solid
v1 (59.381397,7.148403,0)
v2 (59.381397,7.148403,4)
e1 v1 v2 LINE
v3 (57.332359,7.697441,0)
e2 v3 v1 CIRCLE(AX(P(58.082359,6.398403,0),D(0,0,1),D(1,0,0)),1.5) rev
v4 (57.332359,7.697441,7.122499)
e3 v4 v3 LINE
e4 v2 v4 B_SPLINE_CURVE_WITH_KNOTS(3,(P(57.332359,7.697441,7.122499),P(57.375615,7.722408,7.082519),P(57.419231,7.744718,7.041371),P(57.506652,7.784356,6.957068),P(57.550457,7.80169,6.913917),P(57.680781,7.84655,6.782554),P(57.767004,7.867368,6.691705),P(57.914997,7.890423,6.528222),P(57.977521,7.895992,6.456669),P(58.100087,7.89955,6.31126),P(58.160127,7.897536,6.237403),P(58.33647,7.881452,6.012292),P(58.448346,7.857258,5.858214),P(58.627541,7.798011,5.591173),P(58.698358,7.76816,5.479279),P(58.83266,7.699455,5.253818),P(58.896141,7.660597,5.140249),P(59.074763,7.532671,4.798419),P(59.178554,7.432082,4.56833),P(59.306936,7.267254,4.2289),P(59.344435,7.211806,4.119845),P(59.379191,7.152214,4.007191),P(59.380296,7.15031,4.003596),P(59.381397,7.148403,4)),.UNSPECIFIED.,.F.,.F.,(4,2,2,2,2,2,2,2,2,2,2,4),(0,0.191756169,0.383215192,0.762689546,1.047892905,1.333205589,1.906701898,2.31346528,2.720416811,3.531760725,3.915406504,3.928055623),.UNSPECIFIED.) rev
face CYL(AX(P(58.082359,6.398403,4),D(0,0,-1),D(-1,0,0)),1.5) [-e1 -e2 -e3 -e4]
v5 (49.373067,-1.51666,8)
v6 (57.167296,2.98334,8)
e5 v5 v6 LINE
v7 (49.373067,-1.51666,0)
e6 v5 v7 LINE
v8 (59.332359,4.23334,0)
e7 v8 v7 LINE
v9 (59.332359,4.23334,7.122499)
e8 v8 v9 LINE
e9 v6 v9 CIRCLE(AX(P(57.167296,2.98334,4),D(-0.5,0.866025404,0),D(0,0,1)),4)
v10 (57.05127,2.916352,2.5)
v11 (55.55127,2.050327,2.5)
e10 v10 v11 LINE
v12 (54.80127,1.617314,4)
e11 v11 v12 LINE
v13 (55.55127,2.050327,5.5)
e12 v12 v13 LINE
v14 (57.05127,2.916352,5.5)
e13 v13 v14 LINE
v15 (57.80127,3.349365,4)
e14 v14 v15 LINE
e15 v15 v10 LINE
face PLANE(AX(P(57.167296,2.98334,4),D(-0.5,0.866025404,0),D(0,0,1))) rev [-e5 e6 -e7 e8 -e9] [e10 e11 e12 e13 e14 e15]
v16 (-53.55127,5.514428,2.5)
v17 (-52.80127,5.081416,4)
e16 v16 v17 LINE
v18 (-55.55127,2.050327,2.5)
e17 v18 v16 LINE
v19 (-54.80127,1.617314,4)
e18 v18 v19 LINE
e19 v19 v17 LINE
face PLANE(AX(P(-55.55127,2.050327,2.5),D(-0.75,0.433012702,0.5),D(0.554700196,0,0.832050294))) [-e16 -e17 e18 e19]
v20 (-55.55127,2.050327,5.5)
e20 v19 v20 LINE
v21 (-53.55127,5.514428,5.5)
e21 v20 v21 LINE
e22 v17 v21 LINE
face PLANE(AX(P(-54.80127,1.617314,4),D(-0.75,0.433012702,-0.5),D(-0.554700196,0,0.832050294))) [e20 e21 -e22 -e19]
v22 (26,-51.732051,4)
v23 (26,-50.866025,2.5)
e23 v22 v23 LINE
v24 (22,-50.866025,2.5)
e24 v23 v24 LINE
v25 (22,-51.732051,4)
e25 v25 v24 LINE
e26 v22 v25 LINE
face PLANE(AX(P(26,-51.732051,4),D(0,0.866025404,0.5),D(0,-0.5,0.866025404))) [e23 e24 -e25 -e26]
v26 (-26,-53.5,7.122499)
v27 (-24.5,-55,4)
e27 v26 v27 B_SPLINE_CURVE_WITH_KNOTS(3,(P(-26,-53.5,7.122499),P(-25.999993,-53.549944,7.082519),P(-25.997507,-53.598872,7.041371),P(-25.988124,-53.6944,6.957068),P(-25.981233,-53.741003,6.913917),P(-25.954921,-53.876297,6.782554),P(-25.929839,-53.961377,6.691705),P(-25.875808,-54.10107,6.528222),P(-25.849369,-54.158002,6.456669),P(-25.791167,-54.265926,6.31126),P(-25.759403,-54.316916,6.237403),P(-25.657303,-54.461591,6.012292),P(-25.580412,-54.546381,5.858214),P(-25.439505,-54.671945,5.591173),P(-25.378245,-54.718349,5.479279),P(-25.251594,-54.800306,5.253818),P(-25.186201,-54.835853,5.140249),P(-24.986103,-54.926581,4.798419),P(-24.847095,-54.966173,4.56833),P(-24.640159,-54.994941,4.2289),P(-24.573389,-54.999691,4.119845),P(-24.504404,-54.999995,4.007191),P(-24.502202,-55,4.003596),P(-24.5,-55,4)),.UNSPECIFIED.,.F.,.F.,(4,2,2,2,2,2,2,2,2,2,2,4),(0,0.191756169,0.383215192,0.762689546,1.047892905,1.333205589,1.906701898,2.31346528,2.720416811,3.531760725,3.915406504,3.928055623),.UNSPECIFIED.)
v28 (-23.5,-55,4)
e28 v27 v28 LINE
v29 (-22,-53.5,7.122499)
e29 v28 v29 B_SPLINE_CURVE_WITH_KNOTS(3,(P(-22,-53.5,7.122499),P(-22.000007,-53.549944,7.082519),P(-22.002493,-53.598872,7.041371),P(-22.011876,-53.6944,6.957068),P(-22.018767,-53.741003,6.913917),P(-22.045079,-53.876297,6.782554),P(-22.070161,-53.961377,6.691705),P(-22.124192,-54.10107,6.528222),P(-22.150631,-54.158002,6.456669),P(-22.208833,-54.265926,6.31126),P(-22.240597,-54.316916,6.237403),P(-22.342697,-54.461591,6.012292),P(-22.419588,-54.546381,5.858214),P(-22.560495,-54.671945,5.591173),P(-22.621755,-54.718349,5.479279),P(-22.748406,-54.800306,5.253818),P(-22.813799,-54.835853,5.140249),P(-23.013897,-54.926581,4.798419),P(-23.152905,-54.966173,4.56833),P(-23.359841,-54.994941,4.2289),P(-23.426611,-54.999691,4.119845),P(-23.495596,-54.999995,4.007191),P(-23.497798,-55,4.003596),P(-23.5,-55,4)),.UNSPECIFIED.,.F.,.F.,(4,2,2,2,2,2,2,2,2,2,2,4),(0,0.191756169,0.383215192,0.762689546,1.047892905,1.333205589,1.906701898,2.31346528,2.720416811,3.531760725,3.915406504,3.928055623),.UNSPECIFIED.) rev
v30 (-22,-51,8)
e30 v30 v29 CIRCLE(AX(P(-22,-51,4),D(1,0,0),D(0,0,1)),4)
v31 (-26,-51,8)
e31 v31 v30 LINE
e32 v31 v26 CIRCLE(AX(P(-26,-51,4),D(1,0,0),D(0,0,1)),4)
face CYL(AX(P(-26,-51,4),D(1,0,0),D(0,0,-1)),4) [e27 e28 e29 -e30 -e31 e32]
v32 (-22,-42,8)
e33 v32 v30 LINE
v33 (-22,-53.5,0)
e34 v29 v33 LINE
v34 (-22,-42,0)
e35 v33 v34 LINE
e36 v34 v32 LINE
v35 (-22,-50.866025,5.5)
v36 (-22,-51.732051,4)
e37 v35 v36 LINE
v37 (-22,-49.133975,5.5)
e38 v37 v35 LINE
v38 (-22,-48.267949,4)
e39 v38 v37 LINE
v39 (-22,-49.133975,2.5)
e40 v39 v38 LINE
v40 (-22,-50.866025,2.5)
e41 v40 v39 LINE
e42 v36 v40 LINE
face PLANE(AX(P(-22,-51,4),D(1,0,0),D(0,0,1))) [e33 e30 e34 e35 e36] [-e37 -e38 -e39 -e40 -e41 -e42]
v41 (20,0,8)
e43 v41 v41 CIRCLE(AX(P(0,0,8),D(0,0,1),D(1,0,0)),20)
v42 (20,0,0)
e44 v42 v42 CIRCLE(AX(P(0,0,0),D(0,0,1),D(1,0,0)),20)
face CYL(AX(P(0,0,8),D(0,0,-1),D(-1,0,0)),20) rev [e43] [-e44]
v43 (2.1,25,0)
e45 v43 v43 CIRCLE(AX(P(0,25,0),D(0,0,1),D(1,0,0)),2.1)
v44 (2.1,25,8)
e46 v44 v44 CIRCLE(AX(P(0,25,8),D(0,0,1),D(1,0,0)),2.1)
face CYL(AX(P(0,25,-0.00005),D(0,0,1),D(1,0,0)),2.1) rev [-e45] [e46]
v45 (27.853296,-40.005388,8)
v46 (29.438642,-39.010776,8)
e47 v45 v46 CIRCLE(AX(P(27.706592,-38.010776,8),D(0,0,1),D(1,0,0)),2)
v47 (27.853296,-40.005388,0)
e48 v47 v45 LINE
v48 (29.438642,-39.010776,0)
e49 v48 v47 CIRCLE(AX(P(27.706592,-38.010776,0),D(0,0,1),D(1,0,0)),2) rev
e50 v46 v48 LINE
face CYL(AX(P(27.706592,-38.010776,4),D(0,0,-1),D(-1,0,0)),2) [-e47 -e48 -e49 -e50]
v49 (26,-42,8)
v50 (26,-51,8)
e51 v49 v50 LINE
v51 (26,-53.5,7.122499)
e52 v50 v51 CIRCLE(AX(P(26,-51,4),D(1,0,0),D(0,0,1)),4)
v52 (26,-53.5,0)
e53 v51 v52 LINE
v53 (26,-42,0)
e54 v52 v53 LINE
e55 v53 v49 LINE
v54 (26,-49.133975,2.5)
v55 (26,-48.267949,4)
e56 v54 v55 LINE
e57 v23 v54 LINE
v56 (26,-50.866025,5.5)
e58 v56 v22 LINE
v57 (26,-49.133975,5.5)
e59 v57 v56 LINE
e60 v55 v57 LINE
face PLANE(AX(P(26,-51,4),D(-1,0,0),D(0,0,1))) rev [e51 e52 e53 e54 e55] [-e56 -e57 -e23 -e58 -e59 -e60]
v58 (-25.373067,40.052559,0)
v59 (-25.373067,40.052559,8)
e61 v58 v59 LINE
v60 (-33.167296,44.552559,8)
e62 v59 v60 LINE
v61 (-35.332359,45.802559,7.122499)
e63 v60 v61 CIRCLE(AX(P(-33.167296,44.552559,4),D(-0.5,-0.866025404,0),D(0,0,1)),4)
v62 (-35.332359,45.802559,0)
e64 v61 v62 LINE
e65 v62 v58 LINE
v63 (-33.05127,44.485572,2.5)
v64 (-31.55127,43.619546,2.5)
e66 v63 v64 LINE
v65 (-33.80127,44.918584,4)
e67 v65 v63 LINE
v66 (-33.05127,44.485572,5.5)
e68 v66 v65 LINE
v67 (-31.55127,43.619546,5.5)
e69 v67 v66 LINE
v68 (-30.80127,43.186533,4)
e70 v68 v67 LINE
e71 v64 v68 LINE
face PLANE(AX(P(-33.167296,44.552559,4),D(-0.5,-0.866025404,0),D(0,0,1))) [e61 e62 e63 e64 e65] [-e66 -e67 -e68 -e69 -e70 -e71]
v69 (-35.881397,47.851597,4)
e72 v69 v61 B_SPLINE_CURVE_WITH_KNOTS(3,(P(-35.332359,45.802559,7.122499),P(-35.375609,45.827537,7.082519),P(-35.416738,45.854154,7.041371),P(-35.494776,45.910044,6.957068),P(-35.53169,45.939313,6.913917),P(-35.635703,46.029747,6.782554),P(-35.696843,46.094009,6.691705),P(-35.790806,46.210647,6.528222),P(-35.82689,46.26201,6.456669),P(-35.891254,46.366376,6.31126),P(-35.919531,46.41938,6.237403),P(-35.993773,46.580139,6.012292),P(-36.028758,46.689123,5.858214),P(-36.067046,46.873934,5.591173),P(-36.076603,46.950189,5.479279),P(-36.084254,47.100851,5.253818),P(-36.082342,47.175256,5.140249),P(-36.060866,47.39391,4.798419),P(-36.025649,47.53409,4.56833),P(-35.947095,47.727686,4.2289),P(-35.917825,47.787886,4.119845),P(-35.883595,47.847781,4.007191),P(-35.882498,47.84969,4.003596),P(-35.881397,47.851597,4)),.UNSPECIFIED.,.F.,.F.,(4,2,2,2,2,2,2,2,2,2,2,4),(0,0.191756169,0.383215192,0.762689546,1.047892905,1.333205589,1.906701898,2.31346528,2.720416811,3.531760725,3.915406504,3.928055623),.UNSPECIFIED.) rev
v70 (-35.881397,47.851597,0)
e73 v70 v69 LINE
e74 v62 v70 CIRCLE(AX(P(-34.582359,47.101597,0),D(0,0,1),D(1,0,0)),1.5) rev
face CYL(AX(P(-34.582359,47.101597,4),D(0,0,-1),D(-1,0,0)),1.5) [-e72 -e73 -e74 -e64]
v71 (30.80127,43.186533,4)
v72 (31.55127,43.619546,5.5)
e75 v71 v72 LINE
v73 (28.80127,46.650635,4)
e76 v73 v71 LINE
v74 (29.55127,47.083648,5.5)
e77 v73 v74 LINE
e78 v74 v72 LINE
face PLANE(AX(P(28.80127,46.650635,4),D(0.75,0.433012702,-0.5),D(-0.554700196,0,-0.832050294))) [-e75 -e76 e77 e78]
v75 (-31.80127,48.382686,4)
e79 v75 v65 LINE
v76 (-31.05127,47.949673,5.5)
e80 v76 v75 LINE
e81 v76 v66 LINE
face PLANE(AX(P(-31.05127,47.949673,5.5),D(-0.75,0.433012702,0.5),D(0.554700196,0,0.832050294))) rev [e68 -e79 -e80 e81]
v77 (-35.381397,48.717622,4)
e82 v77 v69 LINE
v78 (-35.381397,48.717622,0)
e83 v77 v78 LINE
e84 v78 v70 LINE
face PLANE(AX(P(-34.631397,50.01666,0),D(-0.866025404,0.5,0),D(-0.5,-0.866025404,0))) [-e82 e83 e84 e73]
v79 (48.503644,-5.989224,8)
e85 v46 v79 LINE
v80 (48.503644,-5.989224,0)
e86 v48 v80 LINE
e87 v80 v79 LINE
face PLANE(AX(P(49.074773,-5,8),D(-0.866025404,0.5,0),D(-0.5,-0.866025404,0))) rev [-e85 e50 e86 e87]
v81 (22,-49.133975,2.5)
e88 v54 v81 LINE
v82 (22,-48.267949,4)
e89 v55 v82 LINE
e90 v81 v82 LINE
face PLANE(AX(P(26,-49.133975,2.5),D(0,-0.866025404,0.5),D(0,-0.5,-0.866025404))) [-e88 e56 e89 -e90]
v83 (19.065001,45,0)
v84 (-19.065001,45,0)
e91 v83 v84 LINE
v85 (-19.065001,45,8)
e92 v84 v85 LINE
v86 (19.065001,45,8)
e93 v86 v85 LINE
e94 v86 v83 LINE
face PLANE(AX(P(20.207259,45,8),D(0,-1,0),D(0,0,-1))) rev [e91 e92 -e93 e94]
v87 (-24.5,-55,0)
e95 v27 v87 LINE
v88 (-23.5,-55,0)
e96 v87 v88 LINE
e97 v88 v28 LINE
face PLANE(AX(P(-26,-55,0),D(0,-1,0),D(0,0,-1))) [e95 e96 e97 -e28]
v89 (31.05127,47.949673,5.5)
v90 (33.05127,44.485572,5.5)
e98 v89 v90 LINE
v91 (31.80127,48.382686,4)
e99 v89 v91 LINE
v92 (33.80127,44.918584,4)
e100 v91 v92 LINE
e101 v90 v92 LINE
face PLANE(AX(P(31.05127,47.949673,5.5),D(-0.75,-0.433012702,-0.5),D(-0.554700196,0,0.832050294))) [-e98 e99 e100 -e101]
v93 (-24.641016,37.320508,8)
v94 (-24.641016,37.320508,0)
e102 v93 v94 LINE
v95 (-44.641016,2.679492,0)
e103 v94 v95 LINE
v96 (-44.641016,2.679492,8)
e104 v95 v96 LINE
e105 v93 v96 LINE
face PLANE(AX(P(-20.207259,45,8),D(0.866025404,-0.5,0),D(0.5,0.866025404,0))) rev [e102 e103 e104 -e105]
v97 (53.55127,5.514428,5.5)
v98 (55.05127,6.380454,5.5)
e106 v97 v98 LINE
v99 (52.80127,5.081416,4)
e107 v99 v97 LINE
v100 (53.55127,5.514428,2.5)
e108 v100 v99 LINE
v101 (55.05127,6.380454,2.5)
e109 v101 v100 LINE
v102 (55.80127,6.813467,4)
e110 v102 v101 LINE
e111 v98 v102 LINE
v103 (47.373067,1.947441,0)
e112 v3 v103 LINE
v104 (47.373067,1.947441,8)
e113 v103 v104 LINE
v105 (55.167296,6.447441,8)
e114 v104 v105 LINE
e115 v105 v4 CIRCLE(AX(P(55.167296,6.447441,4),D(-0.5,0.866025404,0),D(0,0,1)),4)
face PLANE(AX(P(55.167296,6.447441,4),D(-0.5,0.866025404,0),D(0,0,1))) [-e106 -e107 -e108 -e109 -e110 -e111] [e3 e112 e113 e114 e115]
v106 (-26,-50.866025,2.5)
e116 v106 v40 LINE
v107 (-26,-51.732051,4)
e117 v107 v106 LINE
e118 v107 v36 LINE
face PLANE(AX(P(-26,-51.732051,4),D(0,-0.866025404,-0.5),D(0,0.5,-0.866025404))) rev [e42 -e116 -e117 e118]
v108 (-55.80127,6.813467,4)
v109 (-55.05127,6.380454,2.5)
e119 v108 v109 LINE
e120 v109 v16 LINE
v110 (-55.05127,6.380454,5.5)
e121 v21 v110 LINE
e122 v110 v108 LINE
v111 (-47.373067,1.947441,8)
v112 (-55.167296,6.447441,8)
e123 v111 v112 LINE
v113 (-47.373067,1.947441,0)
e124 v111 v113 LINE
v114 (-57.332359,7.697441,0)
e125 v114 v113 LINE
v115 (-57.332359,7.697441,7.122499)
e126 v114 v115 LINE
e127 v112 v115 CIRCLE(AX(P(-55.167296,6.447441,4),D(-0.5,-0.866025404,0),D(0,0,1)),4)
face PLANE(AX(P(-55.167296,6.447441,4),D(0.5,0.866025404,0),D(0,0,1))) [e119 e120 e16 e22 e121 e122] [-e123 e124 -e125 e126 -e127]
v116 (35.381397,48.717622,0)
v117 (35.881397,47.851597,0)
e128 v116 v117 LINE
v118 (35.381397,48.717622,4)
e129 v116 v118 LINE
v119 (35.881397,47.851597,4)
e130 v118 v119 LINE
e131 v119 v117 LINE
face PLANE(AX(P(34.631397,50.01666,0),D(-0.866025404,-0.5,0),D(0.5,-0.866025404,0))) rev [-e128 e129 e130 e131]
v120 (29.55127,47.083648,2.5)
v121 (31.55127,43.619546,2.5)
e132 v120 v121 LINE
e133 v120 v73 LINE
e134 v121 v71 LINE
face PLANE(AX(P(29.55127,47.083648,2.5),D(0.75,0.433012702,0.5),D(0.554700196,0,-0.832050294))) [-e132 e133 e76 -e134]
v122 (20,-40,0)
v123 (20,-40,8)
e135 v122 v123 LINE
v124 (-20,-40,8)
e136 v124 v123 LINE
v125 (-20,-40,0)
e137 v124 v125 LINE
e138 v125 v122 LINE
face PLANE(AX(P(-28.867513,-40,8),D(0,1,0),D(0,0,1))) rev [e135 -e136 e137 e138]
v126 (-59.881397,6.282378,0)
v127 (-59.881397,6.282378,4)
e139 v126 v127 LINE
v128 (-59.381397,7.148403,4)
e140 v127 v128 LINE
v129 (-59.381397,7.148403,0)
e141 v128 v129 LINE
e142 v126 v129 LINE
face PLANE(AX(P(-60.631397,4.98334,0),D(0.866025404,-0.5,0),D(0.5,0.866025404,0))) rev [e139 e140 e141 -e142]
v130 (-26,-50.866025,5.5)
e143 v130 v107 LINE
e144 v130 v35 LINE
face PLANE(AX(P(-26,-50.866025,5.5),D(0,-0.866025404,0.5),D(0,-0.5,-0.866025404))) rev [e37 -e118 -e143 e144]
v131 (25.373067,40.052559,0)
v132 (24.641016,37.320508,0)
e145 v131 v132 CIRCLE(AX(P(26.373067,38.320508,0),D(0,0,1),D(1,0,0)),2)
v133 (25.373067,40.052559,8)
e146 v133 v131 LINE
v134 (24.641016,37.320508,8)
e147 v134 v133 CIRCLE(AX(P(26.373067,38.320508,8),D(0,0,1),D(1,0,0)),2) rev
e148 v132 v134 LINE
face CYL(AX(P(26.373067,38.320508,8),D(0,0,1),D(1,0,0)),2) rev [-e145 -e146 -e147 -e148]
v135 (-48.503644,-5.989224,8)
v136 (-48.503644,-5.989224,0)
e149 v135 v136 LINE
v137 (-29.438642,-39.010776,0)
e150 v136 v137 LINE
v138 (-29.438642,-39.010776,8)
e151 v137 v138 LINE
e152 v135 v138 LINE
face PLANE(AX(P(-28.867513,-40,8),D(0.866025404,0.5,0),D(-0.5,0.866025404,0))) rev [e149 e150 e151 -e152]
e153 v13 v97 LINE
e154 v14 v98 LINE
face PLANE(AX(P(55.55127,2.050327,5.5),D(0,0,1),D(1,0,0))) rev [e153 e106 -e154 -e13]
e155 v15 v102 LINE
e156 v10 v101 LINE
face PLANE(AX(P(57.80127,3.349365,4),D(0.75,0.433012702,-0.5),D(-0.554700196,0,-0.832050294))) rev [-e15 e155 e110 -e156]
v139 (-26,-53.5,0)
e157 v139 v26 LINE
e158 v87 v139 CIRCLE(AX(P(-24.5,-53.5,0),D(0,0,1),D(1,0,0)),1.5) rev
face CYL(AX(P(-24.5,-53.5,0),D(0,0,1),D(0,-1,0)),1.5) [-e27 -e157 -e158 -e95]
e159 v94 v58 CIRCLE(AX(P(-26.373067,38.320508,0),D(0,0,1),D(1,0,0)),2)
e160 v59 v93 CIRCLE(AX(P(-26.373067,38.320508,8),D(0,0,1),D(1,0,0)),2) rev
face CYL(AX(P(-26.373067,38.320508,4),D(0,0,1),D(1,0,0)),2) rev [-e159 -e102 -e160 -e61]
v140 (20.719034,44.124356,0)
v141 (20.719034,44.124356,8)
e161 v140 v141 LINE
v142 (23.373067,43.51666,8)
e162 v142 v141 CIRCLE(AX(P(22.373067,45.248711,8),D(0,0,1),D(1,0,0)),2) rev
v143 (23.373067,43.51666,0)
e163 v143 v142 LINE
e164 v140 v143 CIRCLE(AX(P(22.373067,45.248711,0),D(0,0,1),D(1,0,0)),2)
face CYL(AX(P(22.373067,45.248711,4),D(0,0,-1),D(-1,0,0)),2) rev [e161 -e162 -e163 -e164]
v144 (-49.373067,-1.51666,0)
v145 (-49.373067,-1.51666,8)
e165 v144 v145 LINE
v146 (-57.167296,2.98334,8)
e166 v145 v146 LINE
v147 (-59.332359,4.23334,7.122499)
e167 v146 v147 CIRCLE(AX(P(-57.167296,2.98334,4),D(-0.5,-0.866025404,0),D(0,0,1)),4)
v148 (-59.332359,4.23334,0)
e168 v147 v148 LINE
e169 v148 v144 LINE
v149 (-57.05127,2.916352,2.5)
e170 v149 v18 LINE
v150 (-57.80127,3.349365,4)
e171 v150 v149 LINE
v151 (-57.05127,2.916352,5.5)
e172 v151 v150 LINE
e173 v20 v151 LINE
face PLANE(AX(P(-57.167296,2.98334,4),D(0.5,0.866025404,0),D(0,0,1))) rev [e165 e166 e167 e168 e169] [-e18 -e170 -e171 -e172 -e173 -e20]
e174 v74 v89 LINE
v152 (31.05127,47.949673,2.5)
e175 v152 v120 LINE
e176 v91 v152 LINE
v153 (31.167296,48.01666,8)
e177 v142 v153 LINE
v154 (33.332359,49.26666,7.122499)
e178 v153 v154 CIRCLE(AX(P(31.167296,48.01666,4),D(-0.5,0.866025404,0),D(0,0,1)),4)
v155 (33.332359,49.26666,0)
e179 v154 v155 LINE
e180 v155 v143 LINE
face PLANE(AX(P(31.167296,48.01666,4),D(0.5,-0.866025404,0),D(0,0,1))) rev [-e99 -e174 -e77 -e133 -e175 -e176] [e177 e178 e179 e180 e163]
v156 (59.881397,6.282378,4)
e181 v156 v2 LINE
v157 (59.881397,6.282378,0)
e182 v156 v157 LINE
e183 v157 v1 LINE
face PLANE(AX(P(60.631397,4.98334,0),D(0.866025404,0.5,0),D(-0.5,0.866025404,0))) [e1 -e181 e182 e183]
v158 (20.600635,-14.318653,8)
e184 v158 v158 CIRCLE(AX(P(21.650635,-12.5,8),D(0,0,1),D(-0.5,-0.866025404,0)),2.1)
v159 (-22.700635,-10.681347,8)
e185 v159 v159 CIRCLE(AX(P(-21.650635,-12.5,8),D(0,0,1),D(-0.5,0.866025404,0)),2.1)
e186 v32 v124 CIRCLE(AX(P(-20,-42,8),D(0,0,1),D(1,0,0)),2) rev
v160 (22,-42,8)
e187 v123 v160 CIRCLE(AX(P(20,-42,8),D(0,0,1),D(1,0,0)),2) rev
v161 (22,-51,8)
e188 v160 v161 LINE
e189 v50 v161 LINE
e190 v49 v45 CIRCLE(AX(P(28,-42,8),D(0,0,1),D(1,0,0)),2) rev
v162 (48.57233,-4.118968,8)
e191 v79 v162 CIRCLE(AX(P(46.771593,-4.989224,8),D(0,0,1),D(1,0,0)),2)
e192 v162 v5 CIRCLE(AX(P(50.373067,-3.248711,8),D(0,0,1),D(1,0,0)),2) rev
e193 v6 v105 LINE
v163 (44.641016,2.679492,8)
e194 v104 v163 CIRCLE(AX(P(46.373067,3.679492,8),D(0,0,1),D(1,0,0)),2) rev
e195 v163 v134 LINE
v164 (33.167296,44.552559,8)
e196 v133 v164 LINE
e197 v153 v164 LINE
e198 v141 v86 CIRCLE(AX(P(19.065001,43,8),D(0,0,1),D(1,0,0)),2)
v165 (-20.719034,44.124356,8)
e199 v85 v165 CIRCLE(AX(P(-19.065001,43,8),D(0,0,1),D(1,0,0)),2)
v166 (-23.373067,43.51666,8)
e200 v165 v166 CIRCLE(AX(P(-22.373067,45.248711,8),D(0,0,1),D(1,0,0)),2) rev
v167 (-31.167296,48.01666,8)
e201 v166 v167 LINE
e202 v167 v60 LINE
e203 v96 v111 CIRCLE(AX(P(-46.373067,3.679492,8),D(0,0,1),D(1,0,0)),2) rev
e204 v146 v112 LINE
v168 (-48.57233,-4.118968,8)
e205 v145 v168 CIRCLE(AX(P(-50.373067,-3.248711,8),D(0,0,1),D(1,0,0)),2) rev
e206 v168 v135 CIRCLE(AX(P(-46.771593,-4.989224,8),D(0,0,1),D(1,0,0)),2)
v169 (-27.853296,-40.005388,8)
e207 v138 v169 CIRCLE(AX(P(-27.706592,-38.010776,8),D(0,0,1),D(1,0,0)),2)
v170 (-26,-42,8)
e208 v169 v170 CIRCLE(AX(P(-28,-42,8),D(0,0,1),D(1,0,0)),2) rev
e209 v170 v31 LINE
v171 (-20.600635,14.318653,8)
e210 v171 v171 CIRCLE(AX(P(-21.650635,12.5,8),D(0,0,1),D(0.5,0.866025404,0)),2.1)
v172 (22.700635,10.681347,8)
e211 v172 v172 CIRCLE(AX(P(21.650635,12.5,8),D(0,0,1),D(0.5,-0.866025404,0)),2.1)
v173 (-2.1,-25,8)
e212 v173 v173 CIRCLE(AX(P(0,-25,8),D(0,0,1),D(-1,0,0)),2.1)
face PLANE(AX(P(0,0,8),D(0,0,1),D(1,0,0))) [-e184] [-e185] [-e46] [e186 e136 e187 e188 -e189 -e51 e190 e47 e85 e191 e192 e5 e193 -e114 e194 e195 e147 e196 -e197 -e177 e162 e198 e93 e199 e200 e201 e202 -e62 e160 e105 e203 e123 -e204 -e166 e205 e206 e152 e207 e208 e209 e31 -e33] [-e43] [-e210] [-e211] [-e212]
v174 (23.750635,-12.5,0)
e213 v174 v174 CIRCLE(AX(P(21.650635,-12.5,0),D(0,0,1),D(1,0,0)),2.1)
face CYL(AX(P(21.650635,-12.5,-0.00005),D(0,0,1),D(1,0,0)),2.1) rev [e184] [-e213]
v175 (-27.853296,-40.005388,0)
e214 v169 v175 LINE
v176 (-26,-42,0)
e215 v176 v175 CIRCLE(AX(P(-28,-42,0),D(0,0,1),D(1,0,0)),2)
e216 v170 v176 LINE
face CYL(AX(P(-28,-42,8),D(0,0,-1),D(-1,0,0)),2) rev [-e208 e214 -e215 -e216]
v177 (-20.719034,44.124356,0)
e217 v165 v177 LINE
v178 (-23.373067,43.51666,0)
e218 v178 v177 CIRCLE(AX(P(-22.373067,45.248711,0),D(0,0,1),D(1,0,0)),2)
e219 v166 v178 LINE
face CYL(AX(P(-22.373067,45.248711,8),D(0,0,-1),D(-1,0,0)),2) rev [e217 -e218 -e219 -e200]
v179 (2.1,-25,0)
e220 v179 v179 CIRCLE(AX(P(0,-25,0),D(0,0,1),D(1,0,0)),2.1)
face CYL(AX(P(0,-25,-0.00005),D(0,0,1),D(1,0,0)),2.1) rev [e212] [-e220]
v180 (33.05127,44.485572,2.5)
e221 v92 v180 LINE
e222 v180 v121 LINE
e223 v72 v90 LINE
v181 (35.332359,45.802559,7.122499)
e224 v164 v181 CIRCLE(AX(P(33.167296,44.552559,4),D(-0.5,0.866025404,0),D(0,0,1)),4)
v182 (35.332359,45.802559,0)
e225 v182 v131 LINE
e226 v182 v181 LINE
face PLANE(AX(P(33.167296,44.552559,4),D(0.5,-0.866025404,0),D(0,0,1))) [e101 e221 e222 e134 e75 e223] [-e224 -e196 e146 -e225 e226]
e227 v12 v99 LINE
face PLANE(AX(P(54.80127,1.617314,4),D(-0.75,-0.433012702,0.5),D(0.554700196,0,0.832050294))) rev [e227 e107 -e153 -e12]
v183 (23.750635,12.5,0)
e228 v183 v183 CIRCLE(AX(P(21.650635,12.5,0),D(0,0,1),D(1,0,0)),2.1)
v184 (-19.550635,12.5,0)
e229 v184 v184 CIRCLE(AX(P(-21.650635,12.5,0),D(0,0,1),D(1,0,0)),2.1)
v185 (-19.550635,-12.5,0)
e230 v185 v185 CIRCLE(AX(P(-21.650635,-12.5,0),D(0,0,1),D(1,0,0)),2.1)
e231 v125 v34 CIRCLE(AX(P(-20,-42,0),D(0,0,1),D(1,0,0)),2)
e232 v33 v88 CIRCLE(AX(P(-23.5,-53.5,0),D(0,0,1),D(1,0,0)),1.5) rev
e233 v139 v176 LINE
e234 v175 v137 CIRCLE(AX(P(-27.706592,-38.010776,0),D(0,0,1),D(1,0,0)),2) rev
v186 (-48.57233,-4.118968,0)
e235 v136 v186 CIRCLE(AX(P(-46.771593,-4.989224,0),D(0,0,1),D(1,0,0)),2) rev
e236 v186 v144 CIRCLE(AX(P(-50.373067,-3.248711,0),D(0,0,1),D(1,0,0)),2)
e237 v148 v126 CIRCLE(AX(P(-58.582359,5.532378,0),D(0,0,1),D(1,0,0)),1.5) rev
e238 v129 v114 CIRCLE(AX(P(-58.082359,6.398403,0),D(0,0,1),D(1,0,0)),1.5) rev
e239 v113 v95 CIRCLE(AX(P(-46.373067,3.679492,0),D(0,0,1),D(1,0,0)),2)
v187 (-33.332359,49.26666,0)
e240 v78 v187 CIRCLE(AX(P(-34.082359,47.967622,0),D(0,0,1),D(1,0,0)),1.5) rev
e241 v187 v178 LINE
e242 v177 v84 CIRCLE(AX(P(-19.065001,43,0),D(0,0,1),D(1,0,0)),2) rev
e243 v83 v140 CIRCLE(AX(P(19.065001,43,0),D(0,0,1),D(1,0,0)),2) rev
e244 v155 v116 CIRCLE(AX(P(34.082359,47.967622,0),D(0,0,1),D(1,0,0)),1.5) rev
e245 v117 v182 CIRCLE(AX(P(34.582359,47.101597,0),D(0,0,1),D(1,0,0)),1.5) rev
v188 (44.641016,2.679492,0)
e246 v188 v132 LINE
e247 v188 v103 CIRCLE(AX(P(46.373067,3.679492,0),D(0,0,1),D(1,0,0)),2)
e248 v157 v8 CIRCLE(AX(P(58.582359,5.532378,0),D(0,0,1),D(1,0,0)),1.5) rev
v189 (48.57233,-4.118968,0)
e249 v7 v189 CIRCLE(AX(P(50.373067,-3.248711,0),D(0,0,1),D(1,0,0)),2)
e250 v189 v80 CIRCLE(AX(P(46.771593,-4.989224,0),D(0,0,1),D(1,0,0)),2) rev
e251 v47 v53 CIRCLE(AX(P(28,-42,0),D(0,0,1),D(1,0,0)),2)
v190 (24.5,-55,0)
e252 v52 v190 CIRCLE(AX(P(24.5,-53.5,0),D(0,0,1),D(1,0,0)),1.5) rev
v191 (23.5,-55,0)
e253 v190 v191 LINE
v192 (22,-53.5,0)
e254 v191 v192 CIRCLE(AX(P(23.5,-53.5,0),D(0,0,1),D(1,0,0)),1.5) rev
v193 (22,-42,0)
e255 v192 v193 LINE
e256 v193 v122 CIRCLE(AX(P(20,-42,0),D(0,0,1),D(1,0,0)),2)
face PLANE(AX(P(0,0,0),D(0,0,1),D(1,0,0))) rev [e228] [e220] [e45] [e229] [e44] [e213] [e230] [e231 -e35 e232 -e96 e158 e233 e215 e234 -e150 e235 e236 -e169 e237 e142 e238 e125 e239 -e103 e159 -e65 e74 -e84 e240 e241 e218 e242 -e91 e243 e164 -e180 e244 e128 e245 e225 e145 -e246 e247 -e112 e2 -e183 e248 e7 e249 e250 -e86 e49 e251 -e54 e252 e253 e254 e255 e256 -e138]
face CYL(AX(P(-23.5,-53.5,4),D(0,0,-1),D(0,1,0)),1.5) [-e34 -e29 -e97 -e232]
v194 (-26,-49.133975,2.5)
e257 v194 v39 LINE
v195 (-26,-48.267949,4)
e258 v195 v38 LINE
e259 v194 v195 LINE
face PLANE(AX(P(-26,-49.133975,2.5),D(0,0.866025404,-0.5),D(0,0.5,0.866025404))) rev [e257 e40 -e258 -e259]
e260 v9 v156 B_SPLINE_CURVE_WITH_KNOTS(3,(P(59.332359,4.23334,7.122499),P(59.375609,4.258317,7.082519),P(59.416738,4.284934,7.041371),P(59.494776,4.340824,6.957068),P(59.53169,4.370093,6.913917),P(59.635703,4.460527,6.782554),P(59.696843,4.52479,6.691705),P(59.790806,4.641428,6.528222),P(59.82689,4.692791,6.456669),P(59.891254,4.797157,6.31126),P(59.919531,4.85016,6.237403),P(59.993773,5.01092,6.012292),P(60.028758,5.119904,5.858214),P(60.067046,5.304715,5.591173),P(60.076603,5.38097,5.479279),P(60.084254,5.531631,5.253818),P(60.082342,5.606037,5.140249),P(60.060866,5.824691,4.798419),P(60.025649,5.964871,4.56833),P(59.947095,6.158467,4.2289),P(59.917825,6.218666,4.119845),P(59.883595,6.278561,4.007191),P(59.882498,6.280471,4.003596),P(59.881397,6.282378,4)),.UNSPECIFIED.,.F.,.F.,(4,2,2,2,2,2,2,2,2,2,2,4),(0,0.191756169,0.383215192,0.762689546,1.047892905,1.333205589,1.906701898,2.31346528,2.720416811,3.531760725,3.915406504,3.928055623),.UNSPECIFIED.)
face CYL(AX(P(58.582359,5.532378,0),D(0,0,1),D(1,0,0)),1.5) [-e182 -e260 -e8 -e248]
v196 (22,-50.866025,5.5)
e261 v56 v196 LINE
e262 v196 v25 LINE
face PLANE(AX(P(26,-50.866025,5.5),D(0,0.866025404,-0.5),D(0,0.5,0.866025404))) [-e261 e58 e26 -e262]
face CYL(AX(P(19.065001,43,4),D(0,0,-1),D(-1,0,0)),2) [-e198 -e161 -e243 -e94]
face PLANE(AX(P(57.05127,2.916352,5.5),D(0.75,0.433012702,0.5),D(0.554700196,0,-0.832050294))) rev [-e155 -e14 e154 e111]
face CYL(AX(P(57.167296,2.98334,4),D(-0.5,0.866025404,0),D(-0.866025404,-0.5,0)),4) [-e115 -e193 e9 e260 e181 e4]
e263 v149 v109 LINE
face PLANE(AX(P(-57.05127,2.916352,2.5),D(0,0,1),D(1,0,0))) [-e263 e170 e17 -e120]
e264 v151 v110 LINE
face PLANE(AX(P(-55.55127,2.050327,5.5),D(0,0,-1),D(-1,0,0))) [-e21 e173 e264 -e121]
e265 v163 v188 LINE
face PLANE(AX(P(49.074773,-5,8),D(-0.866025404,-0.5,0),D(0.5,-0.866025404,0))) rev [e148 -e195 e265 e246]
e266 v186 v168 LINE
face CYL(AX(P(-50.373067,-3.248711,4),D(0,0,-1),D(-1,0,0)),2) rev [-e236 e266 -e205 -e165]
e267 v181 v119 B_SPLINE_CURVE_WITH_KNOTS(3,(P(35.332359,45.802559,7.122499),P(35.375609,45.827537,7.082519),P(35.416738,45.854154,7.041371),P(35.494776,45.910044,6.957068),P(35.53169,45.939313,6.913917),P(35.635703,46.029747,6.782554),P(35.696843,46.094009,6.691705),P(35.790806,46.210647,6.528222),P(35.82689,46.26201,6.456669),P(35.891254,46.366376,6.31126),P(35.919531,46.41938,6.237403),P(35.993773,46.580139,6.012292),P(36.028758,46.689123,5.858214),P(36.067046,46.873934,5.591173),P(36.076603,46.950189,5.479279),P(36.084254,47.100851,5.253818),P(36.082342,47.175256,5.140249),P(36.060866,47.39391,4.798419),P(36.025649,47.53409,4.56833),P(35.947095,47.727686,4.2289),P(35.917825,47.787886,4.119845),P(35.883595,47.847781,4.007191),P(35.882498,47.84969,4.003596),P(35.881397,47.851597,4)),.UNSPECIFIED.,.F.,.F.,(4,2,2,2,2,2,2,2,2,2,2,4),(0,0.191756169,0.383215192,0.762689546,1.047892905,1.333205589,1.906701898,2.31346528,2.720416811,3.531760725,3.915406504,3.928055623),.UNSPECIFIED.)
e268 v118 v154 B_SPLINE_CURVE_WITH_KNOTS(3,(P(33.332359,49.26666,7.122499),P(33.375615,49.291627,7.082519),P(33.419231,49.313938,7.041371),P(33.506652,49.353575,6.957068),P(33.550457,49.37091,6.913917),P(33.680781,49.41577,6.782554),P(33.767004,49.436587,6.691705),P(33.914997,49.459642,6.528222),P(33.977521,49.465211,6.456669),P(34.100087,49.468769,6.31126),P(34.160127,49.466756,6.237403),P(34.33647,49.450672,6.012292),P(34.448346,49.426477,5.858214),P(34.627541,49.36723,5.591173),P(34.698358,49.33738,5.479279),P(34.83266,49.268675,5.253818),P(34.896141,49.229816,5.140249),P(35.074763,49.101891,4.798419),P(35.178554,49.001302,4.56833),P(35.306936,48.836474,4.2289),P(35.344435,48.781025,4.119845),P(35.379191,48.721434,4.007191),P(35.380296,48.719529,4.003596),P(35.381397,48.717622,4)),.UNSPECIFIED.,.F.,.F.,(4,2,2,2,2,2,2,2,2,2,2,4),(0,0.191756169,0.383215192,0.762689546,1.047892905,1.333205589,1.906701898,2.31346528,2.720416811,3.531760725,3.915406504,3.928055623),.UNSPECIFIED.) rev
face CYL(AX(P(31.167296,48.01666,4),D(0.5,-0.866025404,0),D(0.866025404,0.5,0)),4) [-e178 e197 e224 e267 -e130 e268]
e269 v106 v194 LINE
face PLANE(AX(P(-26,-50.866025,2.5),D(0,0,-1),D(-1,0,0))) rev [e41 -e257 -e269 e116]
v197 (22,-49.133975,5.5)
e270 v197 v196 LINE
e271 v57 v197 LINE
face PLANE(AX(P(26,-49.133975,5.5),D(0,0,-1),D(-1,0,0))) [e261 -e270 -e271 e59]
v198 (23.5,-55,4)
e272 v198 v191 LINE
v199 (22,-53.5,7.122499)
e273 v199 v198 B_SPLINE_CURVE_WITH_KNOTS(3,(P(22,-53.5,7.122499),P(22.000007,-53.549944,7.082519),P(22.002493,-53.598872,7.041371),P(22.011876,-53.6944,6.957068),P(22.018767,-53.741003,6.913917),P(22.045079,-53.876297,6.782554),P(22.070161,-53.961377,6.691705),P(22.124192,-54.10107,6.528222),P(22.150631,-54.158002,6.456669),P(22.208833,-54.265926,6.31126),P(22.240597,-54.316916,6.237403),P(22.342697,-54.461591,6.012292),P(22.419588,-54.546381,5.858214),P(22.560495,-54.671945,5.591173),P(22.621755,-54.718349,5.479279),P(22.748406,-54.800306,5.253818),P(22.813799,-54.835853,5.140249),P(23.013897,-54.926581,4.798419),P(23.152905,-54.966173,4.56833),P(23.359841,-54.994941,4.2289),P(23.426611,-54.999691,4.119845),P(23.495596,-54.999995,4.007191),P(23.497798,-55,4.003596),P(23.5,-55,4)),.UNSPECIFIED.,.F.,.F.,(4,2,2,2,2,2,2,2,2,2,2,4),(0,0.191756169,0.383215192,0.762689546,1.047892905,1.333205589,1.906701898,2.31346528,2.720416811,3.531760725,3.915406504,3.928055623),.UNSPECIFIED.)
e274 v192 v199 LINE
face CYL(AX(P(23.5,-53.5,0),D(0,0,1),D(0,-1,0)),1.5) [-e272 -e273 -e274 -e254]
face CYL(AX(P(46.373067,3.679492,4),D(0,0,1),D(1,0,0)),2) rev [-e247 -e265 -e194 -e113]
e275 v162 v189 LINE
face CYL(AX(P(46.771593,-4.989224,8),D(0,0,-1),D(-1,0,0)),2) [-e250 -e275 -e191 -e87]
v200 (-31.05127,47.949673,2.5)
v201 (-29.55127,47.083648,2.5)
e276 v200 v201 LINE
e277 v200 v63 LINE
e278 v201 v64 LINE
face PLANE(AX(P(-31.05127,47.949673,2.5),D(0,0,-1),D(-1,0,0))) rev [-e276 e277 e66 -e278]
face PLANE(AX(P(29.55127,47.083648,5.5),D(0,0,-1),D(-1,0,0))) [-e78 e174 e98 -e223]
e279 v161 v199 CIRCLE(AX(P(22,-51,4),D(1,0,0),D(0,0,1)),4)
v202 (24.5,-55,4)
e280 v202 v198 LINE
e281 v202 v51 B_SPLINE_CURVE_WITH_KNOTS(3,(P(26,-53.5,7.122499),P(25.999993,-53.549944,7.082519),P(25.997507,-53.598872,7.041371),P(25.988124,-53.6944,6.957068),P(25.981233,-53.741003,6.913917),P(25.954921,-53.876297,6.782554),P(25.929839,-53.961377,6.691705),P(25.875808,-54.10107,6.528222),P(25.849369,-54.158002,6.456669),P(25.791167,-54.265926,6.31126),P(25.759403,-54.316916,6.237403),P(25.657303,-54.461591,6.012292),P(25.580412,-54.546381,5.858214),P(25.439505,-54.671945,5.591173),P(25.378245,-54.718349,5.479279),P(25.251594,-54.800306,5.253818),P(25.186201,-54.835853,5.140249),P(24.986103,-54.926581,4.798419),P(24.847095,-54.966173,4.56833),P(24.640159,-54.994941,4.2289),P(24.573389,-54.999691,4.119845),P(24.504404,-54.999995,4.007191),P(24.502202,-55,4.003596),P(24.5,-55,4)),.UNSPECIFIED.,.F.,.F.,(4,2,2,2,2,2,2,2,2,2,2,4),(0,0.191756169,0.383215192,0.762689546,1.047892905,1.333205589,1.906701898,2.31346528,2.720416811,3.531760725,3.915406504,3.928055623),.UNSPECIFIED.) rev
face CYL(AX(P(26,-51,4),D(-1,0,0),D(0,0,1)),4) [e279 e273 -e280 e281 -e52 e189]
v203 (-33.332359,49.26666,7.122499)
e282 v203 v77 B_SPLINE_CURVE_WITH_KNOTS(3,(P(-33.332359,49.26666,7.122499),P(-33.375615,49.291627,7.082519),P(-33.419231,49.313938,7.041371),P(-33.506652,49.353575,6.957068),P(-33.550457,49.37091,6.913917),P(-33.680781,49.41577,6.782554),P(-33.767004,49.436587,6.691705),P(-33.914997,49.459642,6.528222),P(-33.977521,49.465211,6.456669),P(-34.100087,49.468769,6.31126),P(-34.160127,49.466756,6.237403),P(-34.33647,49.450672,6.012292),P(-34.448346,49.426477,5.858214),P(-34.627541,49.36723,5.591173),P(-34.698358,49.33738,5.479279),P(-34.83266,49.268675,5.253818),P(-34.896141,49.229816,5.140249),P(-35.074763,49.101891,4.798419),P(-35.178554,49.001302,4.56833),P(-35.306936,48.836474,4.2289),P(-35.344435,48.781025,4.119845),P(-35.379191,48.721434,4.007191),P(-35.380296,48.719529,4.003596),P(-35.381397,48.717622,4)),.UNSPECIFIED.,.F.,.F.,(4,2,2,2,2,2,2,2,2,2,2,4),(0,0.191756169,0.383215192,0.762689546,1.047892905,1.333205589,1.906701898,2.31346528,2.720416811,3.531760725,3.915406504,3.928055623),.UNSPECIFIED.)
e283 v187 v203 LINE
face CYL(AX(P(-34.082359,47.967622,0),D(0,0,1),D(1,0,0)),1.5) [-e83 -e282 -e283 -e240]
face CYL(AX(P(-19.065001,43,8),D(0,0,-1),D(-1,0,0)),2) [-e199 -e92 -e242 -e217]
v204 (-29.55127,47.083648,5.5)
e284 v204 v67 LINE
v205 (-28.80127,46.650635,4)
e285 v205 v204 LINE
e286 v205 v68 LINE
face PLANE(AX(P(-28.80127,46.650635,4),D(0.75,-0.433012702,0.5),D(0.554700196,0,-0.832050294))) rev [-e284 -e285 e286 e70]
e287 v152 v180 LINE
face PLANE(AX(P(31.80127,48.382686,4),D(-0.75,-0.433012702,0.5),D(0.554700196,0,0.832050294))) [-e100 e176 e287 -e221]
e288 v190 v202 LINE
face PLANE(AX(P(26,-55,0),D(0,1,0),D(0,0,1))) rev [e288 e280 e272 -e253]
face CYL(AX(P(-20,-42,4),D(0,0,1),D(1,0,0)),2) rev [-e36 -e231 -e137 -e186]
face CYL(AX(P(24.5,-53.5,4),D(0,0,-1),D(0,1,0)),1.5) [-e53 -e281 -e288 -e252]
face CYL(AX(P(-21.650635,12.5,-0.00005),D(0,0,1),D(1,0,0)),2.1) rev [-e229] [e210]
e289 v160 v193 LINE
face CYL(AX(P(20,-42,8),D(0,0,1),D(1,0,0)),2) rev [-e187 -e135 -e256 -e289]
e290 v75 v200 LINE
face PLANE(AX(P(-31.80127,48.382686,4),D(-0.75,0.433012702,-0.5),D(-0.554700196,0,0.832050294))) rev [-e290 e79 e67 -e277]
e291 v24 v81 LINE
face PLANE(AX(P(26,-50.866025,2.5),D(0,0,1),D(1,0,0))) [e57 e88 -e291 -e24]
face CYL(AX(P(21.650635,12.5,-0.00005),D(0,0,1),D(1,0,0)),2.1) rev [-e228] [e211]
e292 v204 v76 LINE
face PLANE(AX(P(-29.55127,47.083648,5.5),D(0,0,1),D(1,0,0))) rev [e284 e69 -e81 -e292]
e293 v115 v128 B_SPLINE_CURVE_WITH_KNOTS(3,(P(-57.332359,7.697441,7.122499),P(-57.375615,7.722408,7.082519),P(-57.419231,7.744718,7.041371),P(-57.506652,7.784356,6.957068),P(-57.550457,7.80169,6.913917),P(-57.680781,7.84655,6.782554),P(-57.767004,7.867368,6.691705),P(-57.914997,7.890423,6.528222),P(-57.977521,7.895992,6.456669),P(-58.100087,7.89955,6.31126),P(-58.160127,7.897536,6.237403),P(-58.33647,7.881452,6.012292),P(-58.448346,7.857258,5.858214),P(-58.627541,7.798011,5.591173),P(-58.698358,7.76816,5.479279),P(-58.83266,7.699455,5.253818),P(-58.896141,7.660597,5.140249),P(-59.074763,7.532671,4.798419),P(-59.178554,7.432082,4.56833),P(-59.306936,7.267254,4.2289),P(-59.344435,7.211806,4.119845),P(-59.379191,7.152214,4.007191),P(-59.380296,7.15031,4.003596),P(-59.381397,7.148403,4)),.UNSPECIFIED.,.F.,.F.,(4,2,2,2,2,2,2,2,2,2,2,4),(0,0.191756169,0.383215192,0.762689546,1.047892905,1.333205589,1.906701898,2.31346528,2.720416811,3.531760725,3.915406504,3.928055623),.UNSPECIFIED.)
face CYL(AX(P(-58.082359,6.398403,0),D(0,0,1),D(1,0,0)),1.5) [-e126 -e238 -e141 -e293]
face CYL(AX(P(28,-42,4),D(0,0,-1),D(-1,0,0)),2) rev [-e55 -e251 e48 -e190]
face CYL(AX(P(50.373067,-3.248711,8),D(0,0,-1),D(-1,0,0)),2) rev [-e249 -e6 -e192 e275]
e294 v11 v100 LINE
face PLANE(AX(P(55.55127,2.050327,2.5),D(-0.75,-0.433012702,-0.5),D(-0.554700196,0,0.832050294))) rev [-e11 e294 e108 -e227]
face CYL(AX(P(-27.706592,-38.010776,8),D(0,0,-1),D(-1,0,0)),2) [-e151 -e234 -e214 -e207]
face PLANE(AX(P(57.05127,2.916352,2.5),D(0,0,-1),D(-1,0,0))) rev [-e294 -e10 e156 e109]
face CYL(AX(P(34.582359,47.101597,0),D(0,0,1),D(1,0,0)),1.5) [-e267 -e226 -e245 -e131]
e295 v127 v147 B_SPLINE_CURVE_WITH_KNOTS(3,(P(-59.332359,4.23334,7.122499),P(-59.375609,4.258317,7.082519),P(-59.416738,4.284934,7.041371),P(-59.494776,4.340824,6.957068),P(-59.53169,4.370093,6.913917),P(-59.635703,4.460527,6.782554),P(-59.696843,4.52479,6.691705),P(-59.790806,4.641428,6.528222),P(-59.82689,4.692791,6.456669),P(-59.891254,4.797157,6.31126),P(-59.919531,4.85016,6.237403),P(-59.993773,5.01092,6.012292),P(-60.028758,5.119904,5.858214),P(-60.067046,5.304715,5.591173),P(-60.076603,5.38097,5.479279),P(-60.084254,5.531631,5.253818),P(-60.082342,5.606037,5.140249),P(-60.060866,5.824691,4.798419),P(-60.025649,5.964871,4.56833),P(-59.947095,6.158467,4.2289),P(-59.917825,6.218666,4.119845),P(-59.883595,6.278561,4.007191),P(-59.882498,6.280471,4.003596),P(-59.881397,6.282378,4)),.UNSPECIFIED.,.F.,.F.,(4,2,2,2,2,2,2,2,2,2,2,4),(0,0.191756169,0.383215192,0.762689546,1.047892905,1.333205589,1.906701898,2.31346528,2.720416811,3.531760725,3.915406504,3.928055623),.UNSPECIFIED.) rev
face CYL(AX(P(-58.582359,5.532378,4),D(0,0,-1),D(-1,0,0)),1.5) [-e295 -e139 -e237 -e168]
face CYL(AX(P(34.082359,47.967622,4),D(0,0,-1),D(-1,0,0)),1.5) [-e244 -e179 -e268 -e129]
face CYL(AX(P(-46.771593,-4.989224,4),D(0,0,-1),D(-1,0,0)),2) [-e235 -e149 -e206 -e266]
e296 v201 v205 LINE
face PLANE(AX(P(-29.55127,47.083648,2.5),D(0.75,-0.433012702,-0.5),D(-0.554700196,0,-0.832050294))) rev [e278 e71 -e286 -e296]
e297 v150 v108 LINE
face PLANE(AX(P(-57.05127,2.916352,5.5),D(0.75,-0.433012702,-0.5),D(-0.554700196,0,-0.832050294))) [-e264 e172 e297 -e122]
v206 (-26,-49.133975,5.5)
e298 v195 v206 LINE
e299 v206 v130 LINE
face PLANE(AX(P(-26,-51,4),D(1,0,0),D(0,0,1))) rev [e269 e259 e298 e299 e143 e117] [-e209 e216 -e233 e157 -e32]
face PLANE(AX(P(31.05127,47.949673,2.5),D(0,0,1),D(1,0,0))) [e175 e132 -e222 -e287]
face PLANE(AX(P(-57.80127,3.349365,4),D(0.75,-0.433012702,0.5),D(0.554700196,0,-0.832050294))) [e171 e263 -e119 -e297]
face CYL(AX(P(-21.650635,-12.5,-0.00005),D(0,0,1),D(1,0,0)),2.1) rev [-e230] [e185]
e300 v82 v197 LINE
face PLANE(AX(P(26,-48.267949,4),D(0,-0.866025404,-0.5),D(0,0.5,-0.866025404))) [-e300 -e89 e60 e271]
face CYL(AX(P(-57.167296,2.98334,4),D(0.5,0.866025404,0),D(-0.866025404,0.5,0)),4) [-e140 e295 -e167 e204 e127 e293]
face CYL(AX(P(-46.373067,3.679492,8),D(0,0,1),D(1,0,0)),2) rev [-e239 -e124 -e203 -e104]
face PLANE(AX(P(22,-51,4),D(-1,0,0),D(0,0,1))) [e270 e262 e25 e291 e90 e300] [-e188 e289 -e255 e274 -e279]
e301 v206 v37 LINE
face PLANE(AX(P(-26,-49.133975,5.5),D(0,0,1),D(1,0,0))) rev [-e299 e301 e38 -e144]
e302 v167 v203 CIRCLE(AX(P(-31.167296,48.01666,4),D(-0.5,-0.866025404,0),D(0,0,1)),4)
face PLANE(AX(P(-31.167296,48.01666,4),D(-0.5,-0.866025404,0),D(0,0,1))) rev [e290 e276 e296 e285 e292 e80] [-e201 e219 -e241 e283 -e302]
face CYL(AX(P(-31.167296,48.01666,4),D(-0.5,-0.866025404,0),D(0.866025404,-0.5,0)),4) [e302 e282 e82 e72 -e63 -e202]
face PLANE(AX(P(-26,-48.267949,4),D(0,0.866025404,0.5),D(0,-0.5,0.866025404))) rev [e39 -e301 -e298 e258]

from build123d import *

# Parameters (mm, degrees)
SKETCH1_R                = 20
BOSS_EXTRUDE1_DEPTH      = 8
BOSS_EXTRUDE3_START      = 22
BOSS_EXTRUDE3_DEPTH      = 4
CIRPATTERN1_COUNT        = 3
CIRPATTERN1_START        = 22
CIRPATTERN1_COPY_1_DEPTH = 4
CIRPATTERN1_COPY_2_DEPTH = 4
SKETCH4_R                = 2.1
CUT_EXTRUDE1_DEPTH       = 83.250631167
CIRPATTERN2_COUNT        = 6
FILLET2_R                = 2
FILLET4_R                = 1.5
FILLET5_R                = 2


with BuildPart() as part:
    # Sketch1 → Boss-Extrude1 (new body)
    with BuildSketch(Plane.XY):
        Polygon((49.074772881, -5), (20.207259422, 45), (-20.207259422, 45), (-49.074772881, -5), (-28.867513459, -40), (28.867513459, -40), align=None)
        Circle(SKETCH1_R, mode=Mode.SUBTRACT)
    extrude(amount=BOSS_EXTRUDE1_DEPTH)

    # Sketch3 → Boss-Extrude3 (add)
    with BuildSketch(Plane(origin=(0, 0, 0), x_dir=(0, 0, -1), z_dir=(1, 0, 0)).offset(BOSS_EXTRUDE3_START)):
        with BuildLine():
            Line((0, -40), (0, -55))
            Line((0, -55), (-4, -55))
            ThreePointArc((-4, -55), (-6.828427125, -53.828427125), (-8, -51))
            Line((-8, -51), (-8, -40))
            Line((-8, -40), (0, -40))
        make_face()
        Polygon((-4, -48.267949192), (-5.5, -49.133974596), (-5.5, -50.866025404), (-4, -51.732050808), (-2.5, -50.866025404), (-2.5, -49.133974596), align=None, mode=Mode.SUBTRACT)
    boss_extrude3 = extrude(amount=BOSS_EXTRUDE3_DEPTH)

    # Mirror1: Boss-Extrude3 across plane
    add(boss_extrude3.mirror(Plane(origin=(0, 0, 0), x_dir=(0, 0, 1), z_dir=(1, 0, 0))))

    # CirPattern1: Boss-Extrude3 ×3 about axis
    cirpattern1_axis = Axis((0, 0, 0), (0, 0, 1))
    for i in range(1, CIRPATTERN1_COUNT):
        add(boss_extrude3.rotate(cirpattern1_axis, i * 360 / CIRPATTERN1_COUNT))

    # CirPattern1 copy 1 sketch → CirPattern1 copy 1 (add)
    with BuildSketch(Plane(origin=(0, 0, 0), x_dir=(0, 0, -1), z_dir=(0.4999999999999998, -0.8660254037844387, 0)).offset(CIRPATTERN1_START)):
        with BuildLine():
            Line((0, 40), (0, 55))
            Line((0, 55), (-4, 55))
            ThreePointArc((-4, 55), (-6.828427125, 53.828427125), (-8, 51))
            Line((-8, 51), (-8, 40))
            Line((-8, 40), (0, 40))
        make_face()
        Polygon((-4, 48.267949192), (-5.5, 49.133974596), (-5.5, 50.866025404), (-4, 51.732050808), (-2.5, 50.866025404), (-2.5, 49.133974596), align=None, mode=Mode.SUBTRACT)
    extrude(amount=CIRPATTERN1_COPY_1_DEPTH)

    # CirPattern1 copy 2 sketch → CirPattern1 copy 2 (add)
    with BuildSketch(Plane(origin=(0, 0, 0), x_dir=(0, 0, -1), z_dir=(0.5000000000000004, 0.8660254037844384, 0)).offset(CIRPATTERN1_START)):
        with BuildLine():
            Line((0, 40), (0, 55))
            Line((0, 55), (-4, 55))
            ThreePointArc((-4, 55), (-6.828427125, 53.828427125), (-8, 51))
            Line((-8, 51), (-8, 40))
            Line((-8, 40), (0, 40))
        make_face()
        Polygon((-4, 48.267949192), (-5.5, 49.133974596), (-5.5, 50.866025404), (-4, 51.732050808), (-2.5, 50.866025404), (-2.5, 49.133974596), align=None, mode=Mode.SUBTRACT)
    extrude(amount=CIRPATTERN1_COPY_2_DEPTH)

    # Sketch4 → Cut-Extrude1 (cut, through all)
    with BuildSketch(Plane.XY.offset(8)):
        with Locations((0, 25)):
            Circle(SKETCH4_R)
    cut_extrude1 = extrude(amount=-CUT_EXTRUDE1_DEPTH, mode=Mode.SUBTRACT)

    # CirPattern2: Cut-Extrude1 ×6 about axis
    cirpattern2_axis = Axis((0, 0, 0), (0, 0, 1))
    for i in range(1, CIRPATTERN2_COUNT):
        add(cut_extrude1.rotate(cirpattern2_axis, i * 360 / CIRPATTERN2_COUNT), mode=Mode.SUBTRACT)

    # Fillet2
    fillet2_edges = [part.edges().sort_by_distance(p)[0] for p in [
        (-26, -40, 4),
        (-22, -40, 4),
        (26, -40, 4),
        (22, -40, 4),
        (-47.641016151, -2.516660498, 4),
        (-23.641016151, 39.052558883, 4),
        (-45.641016151, 0.947441117, 4),
        (-21.641016151, 42.516660498, 4),
        (23.641016151, 39.052558883, 4),
        (21.641016151, 42.516660498, 4),
        (45.641016151, 0.947441117, 4),
        (47.641016151, -2.516660498, 4),
    ]]
    fillet(fillet2_edges, radius=FILLET2_R)

    # Fillet4
    # the kernel refuses this fillet: 1.5 mm, written as the material it takes off along each edge
    with BuildSketch(Plane(origin=(36.631397208, 46.552558883, -3.75), x_dir=(-0.8660254037844387, -0.5, -1.7763568394002503e-15), z_dir=(0, 0, 1)), Plane(origin=(34.631397208, 50.016660498, -3.75), x_dir=(0.5, -0.8660254037844387, 0), z_dir=(0, 0, 1)), Plane(origin=(58.631397208, 8.447441117, -3.75), x_dir=(0.4999999999999998, -0.8660254037844389, 0), z_dir=(0, 0, 1)), Plane(origin=(60.631397208, 4.983339502, -3.75), x_dir=(-0.866025403784439, -0.4999999999999993, -1.7763568394002505e-15), z_dir=(0, 0, 1)), Plane(origin=(-36.631397208, 46.552558883, -3.75), x_dir=(0.5, 0.8660254037844387, 0), z_dir=(0, 0, 1)), Plane(origin=(-34.631397208, 50.016660498, -3.75), x_dir=(0.8660254037844398, -0.49999999999999795, -1.7763568394002505e-15), z_dir=(0, 0, 1))) as fillet4_piece_1:
        with BuildLine():
            CenterArc((FILLET4_R, -FILLET4_R), FILLET4_R, 90, 90)
            Line((0, -FILLET4_R), (0, 0))
            Line((0, 0), (FILLET4_R, 0))
        make_face()
    extrude(amount=11.5, mode=Mode.SUBTRACT)
    with BuildSketch(Plane(origin=(-60.631397208, 4.983339502, -3.75), x_dir=(0.8660254037844379, -0.5000000000000011, -1.7763568394002503e-15), z_dir=(0, 0, 1)), Plane(origin=(-58.631397208, 8.447441117, -3.75), x_dir=(-0.5, -0.8660254037844387, 0), z_dir=(0, 0, 1)), Plane(origin=(26, -55, -3.75), x_dir=(0, 1, 0), z_dir=(0, 0, 1)), Plane(origin=(22, -55, -3.75), x_dir=(1, 0, 0), z_dir=(0, 0, 1)), Plane(origin=(-26, -55, -3.75), x_dir=(1, 0, 0), z_dir=(0, 0, 1)), Plane(origin=(-22, -55, -3.75), x_dir=(0, 1, 0), z_dir=(0, 0, 1))) as fillet4_piece_2:
        with BuildLine():
            CenterArc((FILLET4_R, FILLET4_R), FILLET4_R, 180, 90)
            Line((0, FILLET4_R), (0, 0))
            Line((0, 0), (FILLET4_R, 0))
        make_face()
    extrude(amount=11.5, mode=Mode.SUBTRACT)

    # Fillet5
    fillet5_edges = [part.edges().sort_by_distance(p)[0] for p in [
        (20.207259422, 45, 4),
        (-20.207259422, 45, 4),
        (-49.074772881, -5, 4),
        (-28.867513459, -40, 4),
        (49.074772881, -5, 4),
        (28.867513459, -40, 4),
    ]]
    fillet(fillet5_edges, radius=FILLET5_R)


solid = part.part
